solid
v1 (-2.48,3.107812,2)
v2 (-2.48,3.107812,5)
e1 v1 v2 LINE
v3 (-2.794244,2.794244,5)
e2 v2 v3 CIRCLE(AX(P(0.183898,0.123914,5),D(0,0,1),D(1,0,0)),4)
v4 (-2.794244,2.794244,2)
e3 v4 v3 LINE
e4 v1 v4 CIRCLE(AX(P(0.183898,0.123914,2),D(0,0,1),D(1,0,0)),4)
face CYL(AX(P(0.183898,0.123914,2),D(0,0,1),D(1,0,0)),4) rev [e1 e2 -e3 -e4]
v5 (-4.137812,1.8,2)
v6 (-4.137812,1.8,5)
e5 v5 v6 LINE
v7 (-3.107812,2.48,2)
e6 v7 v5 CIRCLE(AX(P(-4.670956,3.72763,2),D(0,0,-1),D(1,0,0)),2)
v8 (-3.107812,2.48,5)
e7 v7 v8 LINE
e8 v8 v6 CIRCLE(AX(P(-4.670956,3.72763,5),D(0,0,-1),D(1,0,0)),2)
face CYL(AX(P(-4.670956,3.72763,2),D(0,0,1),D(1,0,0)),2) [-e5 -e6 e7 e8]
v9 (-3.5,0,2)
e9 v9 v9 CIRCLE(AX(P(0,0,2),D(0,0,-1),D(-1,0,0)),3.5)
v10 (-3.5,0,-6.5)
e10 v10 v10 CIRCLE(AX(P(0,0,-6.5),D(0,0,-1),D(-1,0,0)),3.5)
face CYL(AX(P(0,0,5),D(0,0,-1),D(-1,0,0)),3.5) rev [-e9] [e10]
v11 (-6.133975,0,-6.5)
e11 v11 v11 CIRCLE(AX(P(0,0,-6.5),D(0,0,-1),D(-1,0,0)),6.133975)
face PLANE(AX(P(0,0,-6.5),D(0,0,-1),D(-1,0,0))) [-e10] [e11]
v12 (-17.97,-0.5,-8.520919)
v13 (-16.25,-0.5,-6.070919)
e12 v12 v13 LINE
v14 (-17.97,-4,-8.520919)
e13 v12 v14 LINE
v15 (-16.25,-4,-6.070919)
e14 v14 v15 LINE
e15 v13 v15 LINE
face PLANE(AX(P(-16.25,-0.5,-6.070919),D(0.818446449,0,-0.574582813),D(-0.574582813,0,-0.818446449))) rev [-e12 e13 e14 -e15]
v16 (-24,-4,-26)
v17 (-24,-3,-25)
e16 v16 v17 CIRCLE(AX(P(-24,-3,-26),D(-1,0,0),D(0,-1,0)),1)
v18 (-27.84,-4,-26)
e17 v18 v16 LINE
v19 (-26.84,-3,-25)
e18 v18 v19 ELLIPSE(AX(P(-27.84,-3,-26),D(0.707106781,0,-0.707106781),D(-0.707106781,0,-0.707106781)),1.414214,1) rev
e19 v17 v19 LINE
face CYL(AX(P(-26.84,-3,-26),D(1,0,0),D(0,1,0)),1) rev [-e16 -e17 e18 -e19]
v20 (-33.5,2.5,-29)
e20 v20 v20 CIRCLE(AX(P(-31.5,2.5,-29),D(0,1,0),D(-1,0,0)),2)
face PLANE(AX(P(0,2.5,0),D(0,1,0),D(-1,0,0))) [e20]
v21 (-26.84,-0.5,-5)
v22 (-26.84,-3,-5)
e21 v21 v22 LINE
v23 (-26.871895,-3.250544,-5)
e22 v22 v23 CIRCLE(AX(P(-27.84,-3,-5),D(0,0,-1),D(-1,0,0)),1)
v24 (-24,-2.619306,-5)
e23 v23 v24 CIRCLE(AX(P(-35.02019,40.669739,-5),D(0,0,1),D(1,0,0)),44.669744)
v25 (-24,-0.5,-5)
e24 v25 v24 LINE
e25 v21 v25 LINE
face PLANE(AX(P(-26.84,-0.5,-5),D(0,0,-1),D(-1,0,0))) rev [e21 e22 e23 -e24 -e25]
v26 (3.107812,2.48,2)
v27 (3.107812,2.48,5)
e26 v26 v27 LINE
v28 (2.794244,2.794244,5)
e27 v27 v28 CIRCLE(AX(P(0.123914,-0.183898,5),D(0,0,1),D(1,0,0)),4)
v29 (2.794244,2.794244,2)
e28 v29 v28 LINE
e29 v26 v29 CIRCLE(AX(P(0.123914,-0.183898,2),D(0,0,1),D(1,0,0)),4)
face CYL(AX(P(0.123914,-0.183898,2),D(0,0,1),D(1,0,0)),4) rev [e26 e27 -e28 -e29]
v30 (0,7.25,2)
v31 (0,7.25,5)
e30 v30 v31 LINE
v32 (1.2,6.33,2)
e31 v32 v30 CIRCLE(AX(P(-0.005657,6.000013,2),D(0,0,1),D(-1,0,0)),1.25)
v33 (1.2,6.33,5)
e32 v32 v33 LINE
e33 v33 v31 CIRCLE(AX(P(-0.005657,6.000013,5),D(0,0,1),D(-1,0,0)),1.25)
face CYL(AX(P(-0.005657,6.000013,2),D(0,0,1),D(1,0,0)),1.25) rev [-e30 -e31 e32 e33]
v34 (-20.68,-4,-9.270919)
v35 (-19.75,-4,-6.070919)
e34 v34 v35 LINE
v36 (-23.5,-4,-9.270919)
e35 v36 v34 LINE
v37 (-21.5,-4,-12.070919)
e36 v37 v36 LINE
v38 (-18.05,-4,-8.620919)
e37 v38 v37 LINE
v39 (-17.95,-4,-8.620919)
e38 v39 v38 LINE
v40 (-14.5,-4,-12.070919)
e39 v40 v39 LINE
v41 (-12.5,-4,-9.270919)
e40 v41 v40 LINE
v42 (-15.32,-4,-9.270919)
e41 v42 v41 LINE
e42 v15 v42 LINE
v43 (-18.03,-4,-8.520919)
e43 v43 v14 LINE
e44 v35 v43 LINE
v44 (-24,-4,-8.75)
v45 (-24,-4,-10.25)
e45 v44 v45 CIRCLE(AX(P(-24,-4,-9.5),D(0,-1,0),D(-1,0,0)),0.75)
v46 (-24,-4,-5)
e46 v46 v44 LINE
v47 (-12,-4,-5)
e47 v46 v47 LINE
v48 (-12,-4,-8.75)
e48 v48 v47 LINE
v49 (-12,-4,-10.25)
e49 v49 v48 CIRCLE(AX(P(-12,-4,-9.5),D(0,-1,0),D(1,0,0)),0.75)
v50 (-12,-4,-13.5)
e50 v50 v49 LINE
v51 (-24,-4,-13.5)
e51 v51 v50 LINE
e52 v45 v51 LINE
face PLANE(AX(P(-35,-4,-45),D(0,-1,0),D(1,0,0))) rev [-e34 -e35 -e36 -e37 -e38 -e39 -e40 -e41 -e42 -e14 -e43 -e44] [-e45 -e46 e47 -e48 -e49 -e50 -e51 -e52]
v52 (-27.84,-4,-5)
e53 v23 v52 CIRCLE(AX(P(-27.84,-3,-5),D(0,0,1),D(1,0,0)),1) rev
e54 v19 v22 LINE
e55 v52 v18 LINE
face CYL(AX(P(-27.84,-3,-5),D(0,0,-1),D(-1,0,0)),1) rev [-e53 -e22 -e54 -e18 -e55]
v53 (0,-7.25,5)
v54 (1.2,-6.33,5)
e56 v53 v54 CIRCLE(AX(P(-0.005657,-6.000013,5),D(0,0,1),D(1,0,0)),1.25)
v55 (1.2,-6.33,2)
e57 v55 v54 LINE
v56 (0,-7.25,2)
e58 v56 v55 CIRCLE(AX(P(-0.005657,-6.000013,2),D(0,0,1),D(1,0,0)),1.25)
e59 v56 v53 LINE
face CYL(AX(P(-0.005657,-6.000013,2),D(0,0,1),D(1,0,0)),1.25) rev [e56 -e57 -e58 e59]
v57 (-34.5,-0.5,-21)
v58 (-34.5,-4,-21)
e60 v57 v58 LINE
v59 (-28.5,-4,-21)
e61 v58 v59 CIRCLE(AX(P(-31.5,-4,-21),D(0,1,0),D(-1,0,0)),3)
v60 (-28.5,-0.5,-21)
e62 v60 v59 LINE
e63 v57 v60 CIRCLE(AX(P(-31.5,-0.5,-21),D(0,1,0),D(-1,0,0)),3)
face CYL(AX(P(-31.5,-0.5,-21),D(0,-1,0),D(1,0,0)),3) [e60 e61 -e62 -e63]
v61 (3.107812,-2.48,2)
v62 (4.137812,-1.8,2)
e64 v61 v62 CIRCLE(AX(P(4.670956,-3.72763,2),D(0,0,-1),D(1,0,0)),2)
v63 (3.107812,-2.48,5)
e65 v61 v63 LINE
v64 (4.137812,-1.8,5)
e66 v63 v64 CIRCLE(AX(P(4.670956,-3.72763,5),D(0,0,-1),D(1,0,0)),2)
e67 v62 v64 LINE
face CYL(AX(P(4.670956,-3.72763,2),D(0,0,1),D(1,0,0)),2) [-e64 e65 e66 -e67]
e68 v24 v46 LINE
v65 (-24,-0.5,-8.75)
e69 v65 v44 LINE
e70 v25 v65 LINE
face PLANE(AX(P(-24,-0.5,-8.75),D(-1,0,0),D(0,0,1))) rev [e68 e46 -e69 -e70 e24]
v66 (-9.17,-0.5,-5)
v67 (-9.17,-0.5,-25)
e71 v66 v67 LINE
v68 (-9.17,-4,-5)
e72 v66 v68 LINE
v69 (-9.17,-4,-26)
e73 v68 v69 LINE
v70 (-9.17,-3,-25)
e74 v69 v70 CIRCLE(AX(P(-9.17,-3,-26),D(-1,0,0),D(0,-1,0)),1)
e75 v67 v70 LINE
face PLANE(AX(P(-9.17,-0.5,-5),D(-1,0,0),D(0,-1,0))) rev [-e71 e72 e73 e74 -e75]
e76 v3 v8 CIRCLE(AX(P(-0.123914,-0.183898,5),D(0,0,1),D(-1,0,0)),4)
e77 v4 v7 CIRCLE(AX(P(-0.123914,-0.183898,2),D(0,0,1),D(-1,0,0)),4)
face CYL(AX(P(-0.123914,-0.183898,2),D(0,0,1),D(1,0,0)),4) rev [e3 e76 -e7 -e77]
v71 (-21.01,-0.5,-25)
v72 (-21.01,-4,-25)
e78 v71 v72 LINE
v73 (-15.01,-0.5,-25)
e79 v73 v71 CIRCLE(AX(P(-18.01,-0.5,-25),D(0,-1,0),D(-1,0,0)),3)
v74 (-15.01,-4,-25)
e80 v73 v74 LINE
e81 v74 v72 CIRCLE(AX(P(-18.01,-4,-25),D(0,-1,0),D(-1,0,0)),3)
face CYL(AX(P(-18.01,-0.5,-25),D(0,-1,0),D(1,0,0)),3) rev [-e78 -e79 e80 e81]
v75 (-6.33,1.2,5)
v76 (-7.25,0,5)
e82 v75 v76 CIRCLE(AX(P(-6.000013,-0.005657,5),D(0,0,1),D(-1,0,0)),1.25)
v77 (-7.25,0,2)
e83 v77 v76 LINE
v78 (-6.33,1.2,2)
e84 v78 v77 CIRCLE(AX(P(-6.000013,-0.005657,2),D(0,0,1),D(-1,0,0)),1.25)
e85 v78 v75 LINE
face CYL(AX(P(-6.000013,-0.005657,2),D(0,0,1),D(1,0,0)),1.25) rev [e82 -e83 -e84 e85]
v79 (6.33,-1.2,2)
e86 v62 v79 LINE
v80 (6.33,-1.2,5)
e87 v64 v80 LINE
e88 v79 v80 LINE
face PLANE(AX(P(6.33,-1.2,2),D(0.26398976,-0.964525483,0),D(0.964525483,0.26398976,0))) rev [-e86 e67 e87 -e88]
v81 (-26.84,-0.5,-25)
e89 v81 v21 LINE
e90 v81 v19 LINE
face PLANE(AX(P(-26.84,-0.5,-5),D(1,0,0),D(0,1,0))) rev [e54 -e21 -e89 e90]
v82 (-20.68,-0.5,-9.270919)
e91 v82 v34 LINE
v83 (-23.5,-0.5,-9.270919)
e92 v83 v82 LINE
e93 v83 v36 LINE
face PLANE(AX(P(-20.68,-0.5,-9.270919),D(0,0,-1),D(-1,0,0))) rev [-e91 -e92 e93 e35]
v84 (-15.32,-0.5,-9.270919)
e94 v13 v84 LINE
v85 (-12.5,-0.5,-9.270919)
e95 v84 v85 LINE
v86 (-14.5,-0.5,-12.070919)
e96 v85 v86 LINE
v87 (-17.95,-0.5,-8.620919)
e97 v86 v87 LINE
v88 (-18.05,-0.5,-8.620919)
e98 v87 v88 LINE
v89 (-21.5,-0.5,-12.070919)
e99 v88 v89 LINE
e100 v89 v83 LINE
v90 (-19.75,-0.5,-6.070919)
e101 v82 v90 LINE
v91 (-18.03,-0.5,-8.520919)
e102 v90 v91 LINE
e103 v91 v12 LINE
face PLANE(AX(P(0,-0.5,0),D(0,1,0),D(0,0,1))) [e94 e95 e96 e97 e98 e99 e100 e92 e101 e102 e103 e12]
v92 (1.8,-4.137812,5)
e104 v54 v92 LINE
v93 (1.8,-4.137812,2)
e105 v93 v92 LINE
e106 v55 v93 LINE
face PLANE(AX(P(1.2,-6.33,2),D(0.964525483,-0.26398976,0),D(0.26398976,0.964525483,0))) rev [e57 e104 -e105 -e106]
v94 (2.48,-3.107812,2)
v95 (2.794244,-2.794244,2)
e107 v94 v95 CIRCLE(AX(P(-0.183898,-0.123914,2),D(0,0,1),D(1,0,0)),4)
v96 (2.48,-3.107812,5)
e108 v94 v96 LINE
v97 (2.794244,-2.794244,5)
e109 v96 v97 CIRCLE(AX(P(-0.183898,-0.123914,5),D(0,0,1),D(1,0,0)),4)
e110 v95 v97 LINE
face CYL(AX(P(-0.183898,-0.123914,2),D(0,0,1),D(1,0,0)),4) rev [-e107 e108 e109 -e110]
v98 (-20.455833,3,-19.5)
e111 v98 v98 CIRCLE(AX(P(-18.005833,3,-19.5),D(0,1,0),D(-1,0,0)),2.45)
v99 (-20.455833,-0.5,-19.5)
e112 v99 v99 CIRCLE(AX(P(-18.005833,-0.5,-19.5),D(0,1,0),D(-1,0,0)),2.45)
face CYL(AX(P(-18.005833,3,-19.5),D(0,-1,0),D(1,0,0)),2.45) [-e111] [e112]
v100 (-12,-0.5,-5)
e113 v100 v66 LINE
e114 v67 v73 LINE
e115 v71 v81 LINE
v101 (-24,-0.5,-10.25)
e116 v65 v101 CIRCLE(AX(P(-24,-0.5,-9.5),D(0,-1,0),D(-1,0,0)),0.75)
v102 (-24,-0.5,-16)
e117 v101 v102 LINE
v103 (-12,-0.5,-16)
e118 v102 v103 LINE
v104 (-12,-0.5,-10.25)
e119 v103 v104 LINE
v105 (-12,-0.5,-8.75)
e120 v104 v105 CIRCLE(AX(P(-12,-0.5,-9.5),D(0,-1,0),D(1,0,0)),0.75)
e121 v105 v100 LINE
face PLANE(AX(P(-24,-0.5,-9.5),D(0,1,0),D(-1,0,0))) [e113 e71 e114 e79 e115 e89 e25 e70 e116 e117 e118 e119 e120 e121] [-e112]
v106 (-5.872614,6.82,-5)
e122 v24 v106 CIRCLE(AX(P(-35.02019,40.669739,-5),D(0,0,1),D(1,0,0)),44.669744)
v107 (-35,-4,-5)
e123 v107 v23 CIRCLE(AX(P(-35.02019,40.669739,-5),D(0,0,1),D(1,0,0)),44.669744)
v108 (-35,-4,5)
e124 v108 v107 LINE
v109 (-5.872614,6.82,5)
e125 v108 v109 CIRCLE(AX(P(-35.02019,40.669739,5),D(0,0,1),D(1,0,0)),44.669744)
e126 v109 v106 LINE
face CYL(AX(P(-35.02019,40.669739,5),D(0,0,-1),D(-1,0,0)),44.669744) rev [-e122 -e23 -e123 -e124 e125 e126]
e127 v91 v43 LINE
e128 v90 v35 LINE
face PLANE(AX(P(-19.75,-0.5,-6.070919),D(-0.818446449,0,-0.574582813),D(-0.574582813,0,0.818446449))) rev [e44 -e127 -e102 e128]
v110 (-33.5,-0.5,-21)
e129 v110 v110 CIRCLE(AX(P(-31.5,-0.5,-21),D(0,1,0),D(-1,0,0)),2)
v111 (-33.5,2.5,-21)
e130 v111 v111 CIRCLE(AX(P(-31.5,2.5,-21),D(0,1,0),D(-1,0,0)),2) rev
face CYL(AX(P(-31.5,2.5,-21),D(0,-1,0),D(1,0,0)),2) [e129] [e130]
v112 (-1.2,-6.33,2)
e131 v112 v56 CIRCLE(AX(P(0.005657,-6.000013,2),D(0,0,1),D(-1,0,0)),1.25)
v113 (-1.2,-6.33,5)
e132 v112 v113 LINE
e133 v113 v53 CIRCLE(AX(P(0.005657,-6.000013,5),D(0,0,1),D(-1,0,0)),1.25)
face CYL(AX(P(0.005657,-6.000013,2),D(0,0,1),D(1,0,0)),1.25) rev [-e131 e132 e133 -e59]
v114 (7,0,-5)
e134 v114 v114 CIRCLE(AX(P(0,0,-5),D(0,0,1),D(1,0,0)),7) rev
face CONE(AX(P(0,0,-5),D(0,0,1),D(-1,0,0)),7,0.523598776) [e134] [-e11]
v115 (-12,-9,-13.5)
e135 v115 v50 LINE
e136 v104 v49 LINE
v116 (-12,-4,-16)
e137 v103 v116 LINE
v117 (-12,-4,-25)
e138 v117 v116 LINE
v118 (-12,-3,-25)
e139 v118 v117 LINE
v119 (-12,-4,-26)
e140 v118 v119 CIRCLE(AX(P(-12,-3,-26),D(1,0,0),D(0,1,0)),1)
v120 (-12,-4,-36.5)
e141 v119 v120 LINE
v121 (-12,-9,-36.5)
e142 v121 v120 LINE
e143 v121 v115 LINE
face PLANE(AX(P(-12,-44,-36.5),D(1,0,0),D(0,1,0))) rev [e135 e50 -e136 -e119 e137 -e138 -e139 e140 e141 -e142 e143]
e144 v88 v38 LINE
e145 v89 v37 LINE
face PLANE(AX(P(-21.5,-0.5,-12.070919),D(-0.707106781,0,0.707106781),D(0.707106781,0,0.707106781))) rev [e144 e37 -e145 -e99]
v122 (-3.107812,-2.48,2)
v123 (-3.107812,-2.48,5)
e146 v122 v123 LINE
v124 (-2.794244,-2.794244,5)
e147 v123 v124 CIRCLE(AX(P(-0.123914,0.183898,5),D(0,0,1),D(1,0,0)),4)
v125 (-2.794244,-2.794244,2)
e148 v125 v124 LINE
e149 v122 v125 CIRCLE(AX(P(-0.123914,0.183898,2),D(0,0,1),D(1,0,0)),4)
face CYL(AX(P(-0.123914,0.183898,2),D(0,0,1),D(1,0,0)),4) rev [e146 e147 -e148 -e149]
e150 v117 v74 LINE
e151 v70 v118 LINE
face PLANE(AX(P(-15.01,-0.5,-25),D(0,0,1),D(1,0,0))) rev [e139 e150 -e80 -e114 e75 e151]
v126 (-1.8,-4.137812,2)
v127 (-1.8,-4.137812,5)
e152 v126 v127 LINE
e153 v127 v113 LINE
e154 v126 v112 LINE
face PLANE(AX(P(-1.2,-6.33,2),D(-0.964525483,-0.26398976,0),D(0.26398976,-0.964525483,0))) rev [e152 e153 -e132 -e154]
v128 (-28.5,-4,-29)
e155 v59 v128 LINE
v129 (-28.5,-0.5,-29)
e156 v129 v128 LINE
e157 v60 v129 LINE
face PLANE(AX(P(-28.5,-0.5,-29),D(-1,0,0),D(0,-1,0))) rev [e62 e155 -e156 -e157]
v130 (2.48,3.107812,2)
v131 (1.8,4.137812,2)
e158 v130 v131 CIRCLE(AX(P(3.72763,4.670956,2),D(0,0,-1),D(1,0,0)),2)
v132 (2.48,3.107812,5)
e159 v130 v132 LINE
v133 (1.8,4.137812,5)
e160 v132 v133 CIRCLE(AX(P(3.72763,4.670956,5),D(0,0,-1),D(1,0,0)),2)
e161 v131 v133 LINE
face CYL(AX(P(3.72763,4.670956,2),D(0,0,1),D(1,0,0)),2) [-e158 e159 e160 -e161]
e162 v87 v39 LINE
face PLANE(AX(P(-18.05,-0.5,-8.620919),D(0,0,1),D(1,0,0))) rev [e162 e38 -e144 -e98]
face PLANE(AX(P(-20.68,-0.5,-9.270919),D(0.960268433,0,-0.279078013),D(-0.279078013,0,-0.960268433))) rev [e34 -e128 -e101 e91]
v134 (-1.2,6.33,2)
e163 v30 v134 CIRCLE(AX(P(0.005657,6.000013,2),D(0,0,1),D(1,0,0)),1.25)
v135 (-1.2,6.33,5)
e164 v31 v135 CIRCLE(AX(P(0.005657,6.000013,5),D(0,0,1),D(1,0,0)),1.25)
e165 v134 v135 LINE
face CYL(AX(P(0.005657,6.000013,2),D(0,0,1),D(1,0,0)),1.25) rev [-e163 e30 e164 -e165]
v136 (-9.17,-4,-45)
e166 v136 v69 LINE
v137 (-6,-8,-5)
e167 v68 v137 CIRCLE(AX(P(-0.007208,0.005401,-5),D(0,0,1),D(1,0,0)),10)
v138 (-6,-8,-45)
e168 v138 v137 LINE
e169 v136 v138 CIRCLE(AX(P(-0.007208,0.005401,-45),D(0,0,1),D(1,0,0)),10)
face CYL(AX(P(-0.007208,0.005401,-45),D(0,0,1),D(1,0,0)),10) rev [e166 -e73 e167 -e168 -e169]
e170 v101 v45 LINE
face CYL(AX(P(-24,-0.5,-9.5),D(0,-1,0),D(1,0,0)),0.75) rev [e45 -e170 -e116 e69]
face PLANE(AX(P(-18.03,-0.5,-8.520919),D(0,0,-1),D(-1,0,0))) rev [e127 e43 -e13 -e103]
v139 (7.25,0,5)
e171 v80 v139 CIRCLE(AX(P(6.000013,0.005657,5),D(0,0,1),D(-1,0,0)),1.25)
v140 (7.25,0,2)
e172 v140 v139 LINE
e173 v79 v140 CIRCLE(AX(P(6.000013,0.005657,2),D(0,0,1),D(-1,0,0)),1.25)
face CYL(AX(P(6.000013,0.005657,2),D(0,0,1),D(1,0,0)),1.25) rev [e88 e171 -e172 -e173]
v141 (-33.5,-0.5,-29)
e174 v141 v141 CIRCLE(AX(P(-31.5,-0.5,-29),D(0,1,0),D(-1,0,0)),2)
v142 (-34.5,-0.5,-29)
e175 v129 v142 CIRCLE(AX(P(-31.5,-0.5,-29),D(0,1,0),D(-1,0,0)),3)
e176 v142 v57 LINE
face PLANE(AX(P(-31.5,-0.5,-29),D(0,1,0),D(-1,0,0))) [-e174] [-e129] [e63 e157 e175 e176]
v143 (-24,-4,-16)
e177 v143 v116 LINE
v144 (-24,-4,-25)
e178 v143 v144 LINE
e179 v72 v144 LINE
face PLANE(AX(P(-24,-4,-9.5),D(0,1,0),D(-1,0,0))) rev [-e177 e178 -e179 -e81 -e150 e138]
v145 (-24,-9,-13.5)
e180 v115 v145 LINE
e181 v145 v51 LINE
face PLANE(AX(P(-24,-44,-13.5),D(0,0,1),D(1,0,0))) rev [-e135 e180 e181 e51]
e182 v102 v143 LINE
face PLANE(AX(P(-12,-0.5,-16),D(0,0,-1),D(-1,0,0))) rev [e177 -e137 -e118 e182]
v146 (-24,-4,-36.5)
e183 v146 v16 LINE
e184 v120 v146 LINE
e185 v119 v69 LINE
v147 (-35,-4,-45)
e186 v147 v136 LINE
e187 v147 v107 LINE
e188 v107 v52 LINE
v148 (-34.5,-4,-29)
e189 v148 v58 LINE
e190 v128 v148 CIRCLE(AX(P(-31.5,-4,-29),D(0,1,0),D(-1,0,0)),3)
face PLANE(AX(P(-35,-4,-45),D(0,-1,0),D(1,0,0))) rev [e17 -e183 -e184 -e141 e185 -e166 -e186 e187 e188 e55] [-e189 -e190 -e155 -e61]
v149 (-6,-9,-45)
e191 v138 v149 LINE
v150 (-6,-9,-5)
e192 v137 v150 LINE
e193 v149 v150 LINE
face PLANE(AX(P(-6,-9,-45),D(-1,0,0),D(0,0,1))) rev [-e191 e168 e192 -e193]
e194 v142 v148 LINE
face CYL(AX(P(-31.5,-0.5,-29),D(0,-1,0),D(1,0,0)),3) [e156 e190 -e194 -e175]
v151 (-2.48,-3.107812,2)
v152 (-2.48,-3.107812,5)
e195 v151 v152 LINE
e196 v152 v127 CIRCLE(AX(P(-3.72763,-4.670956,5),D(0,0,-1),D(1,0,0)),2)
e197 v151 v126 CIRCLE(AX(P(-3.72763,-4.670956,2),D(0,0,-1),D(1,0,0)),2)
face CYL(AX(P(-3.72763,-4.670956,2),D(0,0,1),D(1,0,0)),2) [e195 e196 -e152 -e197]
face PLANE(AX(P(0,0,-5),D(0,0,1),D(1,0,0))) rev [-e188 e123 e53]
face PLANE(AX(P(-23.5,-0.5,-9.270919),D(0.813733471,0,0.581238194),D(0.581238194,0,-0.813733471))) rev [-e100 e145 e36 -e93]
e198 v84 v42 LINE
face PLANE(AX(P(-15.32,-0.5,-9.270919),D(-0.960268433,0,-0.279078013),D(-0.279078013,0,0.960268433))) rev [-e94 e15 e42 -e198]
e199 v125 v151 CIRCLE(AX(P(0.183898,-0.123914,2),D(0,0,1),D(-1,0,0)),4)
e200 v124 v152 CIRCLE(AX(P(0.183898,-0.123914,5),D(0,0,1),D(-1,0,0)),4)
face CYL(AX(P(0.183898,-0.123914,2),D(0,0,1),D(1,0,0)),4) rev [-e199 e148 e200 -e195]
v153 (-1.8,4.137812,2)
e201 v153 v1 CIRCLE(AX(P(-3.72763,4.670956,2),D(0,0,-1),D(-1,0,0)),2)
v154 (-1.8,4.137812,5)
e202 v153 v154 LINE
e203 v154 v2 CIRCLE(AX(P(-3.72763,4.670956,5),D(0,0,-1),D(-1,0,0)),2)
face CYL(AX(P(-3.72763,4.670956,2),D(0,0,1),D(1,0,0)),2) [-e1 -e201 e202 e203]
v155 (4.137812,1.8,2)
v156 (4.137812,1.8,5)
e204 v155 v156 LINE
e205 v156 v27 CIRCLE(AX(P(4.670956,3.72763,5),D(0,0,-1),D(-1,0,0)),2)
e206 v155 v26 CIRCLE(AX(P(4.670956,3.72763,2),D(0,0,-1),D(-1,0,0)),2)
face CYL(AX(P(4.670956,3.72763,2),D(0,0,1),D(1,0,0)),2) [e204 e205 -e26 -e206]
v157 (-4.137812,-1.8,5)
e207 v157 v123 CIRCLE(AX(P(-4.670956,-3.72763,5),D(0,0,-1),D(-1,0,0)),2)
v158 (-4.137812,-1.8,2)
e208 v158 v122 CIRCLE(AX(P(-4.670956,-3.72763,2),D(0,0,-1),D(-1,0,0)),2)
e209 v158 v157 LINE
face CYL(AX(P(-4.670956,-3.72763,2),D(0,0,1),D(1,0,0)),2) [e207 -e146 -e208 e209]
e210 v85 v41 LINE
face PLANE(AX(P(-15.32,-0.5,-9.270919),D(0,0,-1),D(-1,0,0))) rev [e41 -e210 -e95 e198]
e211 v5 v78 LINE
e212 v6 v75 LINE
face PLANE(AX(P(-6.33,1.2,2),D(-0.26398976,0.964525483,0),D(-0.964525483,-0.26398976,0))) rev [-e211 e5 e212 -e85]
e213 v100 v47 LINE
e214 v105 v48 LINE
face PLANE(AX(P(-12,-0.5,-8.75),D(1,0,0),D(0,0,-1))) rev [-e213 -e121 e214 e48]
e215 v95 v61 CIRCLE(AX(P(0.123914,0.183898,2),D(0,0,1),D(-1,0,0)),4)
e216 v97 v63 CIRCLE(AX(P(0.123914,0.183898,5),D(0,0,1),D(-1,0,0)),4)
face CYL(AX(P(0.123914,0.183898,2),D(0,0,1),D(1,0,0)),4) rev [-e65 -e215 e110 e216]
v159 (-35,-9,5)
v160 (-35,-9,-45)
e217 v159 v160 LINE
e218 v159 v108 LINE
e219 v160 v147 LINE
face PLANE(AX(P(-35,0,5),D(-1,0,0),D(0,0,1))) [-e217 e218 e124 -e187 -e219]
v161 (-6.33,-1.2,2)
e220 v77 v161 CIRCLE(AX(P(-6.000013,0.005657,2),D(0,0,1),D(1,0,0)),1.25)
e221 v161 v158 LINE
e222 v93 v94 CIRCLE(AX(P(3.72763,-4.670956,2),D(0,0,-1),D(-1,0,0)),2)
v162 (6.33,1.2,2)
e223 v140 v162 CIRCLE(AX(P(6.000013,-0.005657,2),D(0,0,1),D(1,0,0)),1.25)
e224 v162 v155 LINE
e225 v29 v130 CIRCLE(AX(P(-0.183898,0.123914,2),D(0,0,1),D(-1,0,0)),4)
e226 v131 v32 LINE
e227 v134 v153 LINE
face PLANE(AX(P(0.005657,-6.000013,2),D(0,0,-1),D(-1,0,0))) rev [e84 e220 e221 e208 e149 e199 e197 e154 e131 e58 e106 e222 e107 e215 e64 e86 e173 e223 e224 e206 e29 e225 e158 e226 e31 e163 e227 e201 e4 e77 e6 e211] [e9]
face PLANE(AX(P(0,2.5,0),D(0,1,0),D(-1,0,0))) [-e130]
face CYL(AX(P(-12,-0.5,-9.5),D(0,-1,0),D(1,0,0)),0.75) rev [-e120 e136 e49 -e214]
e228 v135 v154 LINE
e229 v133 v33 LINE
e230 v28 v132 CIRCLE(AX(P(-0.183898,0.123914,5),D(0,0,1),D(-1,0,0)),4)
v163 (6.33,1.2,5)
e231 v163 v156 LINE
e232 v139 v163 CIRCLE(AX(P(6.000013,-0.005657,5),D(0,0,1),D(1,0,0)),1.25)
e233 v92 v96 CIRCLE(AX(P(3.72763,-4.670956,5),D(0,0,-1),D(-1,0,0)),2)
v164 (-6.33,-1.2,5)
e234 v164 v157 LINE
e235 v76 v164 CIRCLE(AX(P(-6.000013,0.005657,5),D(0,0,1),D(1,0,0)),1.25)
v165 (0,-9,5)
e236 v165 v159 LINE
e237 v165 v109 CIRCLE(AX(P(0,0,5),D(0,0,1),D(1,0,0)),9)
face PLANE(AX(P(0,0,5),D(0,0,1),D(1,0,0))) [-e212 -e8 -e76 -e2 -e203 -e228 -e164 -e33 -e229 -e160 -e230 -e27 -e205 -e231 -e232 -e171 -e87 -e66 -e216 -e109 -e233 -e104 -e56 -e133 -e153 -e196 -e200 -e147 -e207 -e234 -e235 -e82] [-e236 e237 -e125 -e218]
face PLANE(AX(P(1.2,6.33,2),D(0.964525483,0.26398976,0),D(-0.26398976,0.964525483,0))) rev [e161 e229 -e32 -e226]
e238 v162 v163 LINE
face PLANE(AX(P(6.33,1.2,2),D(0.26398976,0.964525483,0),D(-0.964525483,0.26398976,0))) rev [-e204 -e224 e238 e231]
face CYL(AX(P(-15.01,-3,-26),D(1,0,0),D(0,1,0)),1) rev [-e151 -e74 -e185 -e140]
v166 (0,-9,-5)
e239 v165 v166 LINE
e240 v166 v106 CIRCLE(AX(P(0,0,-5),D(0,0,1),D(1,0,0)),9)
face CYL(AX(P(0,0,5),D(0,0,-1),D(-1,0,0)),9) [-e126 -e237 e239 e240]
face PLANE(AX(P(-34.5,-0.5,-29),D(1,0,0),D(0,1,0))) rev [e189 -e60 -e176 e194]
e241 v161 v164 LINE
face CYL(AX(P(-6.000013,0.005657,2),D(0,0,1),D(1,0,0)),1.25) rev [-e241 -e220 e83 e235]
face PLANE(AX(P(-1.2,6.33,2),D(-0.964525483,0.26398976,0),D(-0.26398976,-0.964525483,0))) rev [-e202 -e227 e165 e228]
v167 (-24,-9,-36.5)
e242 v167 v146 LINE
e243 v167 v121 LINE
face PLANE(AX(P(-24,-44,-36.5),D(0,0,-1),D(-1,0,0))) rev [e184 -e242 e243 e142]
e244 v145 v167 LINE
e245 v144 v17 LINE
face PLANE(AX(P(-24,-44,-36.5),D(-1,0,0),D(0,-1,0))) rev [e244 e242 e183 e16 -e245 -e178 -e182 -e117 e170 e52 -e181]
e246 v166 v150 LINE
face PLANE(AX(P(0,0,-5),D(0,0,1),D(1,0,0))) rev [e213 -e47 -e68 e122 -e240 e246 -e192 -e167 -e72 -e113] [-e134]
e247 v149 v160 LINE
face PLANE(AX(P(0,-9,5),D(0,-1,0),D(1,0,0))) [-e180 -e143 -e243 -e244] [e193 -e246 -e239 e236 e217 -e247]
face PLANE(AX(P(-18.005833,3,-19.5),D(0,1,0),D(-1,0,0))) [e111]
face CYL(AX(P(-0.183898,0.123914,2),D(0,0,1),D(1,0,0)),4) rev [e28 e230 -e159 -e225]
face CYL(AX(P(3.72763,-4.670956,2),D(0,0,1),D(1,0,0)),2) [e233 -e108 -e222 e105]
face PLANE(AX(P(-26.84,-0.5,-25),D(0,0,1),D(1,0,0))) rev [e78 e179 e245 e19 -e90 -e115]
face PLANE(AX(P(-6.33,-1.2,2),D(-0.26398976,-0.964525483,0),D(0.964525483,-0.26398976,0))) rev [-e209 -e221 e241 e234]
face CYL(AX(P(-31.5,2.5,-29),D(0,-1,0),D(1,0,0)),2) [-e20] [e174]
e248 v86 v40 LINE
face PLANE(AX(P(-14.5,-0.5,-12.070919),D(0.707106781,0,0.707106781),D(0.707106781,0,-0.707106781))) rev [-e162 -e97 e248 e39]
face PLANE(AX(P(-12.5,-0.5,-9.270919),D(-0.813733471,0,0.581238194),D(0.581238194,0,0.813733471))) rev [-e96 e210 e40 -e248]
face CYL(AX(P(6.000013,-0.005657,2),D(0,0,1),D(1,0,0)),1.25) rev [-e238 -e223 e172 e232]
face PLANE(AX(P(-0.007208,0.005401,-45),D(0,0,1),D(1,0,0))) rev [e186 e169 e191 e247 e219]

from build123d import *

# Parameters (mm, degrees)
SKETCH1_R                     = 9
BOSS_EXTRUDE1_DEPTH           = 5
SKETCH2_R                     = 7
BOSS_EXTRUDE2_DEPTH           = 1.5
BOSS_EXTRUDE2_TAPER           = 30
BOSS_EXTRUDE2_OTHER_WAY_DEPTH = 1.5
BOSS_EXTRUDE2_OTHER_WAY_TAPER = 30
CUT_EXTRUDE1_DEPTH            = 3
BOSS_EXTRUDE3_DEPTH           = 40
SKETCH5_W                     = 12
SKETCH5_H                     = 23
CUT_EXTRUDE2_DEPTH            = 40
BOSS_EXTRUDE4_DEPTH           = 3.5
SKETCH7_R                     = 2
BOSS_EXTRUDE5_DEPTH           = 3
SKETCH8_R                     = 3.5
CUT_EXTRUDE3_DEPTH            = 53.803882433
BOSS_EXTRUDE6_DEPTH           = 3.5
SKETCH10_R                    = 2.45
BOSS_EXTRUDE7_DEPTH           = 3.5
BOSS_EXTRUDE8_DEPTH           = 3.5
FILLET1_START                 = -26.84
FILLET1_DEPTH                 = 2.84
FILLET1_START_2               = -12
FILLET1_2_DEPTH               = 2.83
FILLET1_START_3               = -26
FILLET1_3_DEPTH               = 21
FILLET1_START_4               = -27.84
FILLET1_4_DEPTH               = 1


with BuildPart() as part:
    # Sketch1 → Boss-Extrude1 (new, symmetric)
    with BuildSketch(Plane.XY):
        Circle(SKETCH1_R)
        with BuildLine():
            Line((-35, -9), (0, -9))
            ThreePointArc((0, -9), (-8.437416666, -3.132091953), (-5.872614409, 6.82))
            ThreePointArc((-5.872614409, 6.82), (-19.465199243, -1.204217751), (-35, -4))
            Line((-35, -4), (-35, -9))
        make_face()
    extrude(amount=BOSS_EXTRUDE1_DEPTH, both=True)

    # Sketch2 → Boss-Extrude2 (add)
    with BuildSketch(Plane(origin=(0, 0, -5), x_dir=(-1, 0, 0), z_dir=(0, 0, -1))):
        Circle(SKETCH2_R)
    extrude(amount=BOSS_EXTRUDE2_DEPTH, taper=BOSS_EXTRUDE2_TAPER)

    # Sketch2 → Boss-Extrude2 other way (add)
    with BuildSketch(Plane(origin=(0, 0, -5), x_dir=(-1, 0, 0), z_dir=(0, 0, -1))):
        Circle(SKETCH2_R)
    extrude(amount=-BOSS_EXTRUDE2_OTHER_WAY_DEPTH, taper=BOSS_EXTRUDE2_OTHER_WAY_TAPER)

    # Sketch3 → Cut-Extrude1 (cut)
    with BuildSketch(Plane.XY.offset(5)):
        with BuildLine():
            Line((1.2, -6.33), (1.8, -4.1378116))
            ThreePointArc((1.8, -4.1378116), (2.058560194, -3.569045514), (2.48, -3.1078116))
            ThreePointArc((2.48, -3.1078116), (2.641475661, -2.955390865), (2.794244497, -2.794244497))
            ThreePointArc((2.794244497, -2.794244497), (2.955390865, -2.641475661), (3.1078116, -2.48))
            ThreePointArc((3.1078116, -2.48), (3.569045514, -2.058560194), (4.1378116, -1.8))
            Line((4.1378116, -1.8), (6.33, -1.2))
            ThreePointArc((6.33, -1.2), (6.992020752, -0.754882576), (7.25, 0))
            ThreePointArc((7.25, 0), (6.992020752, 0.754882576), (6.33, 1.2))
            Line((6.33, 1.2), (4.1378116, 1.8))
            ThreePointArc((4.1378116, 1.8), (3.569045514, 2.058560194), (3.1078116, 2.48))
            ThreePointArc((3.1078116, 2.48), (2.955390865, 2.641475661), (2.794244497, 2.794244497))
            ThreePointArc((2.794244497, 2.794244497), (2.641475661, 2.955390865), (2.48, 3.1078116))
            ThreePointArc((2.48, 3.1078116), (2.058560194, 3.569045514), (1.8, 4.1378116))
            Line((1.8, 4.1378116), (1.2, 6.33))
            ThreePointArc((1.2, 6.33), (0.754882576, 6.992020752), (0, 7.25))
            ThreePointArc((0, 7.25), (-0.754882576, 6.992020752), (-1.2, 6.33))
            Line((-1.2, 6.33), (-1.8, 4.1378116))
            ThreePointArc((-1.8, 4.1378116), (-2.058560194, 3.569045514), (-2.48, 3.1078116))
            ThreePointArc((-2.48, 3.1078116), (-2.641475661, 2.955390865), (-2.794244497, 2.794244497))
            ThreePointArc((-2.794244497, 2.794244497), (-2.955390865, 2.641475661), (-3.1078116, 2.48))
            ThreePointArc((-3.1078116, 2.48), (-3.569045514, 2.058560194), (-4.1378116, 1.8))
            Line((-4.1378116, 1.8), (-6.33, 1.2))
            ThreePointArc((-6.33, 1.2), (-6.992020752, 0.754882576), (-7.25, 0))
            ThreePointArc((-7.25, 0), (-6.992020752, -0.754882576), (-6.33, -1.2))
            Line((-6.33, -1.2), (-4.1378116, -1.8))
            ThreePointArc((-4.1378116, -1.8), (-3.569045514, -2.058560194), (-3.1078116, -2.48))
            ThreePointArc((-3.1078116, -2.48), (-2.955390865, -2.641475661), (-2.794244497, -2.794244497))
            ThreePointArc((-2.794244497, -2.794244497), (-2.641475661, -2.955390865), (-2.48, -3.1078116))
            ThreePointArc((-2.48, -3.1078116), (-2.058560194, -3.569045514), (-1.8, -4.1378116))
            Line((-1.8, -4.1378116), (-1.2, -6.33))
            ThreePointArc((-1.2, -6.33), (-0.754882576, -6.992020752), (0, -7.25))
            ThreePointArc((0, -7.25), (0.754882576, -6.992020752), (1.2, -6.33))
        make_face()
    extrude(amount=-CUT_EXTRUDE1_DEPTH, mode=Mode.SUBTRACT)

    # Sketch4 → Boss-Extrude3 (add)
    with BuildSketch(Plane(origin=(0, 0, -5), x_dir=(-1, 0, 0), z_dir=(0, 0, -1))):
        with BuildLine():
            Line((35, -9), (35, -4))
            Line((35, -4), (9.17, -4))
            ThreePointArc((9.17, -4), (7.844486312, -6.205642902), (6, -8))
            Line((6, -8), (6, -9))
            Line((6, -9), (35, -9))
        make_face()
    extrude(amount=BOSS_EXTRUDE3_DEPTH)

    # Sketch5 → Cut-Extrude2 (cut)
    with BuildSketch(Plane(origin=(0, -4, 0), x_dir=(1, 0, 0), z_dir=(0, 1, 0))):
        with Locations((-18, 25)):
            Rectangle(SKETCH5_W, SKETCH5_H)
    extrude(amount=-CUT_EXTRUDE2_DEPTH, mode=Mode.SUBTRACT)

    # Sketch6 → Boss-Extrude4 (add)
    with BuildSketch(Plane(origin=(0, -4, 0), x_dir=(1, 0, 0), z_dir=(0, 1, 0))):
        with BuildLine():
            Line((-28.5, 29), (-28.5, 21))
            ThreePointArc((-28.5, 21), (-31.5, 18), (-34.5, 21))
            Line((-34.5, 21), (-34.5, 29))
            ThreePointArc((-34.5, 29), (-31.5, 32), (-28.5, 29))
        make_face()
    extrude(amount=BOSS_EXTRUDE4_DEPTH)

    # Sketch7 → Boss-Extrude5 (add)
    with BuildSketch(Plane(origin=(0, -0.5, 0), x_dir=(1, 0, 0), z_dir=(0, 1, 0))):
        with Locations(Location((-31.5, 29, 0), (0, 0, 180))):
            Circle(SKETCH7_R)
        with Locations(Location((-31.5, 21, 0), (0, 0, 180))):
            Circle(SKETCH7_R)
    extrude(amount=BOSS_EXTRUDE5_DEPTH)

    # Sketch8 → Cut-Extrude3 (cut, through all)
    with BuildSketch(Plane(origin=(0, 0, -6.5), x_dir=(-1, 0, 0), z_dir=(0, 0, -1))):
        Circle(SKETCH8_R)
    extrude(amount=-CUT_EXTRUDE3_DEPTH, mode=Mode.SUBTRACT)

    # Sketch9 → Boss-Extrude6 (add)
    with BuildSketch(Plane(origin=(0, -4, 0), x_dir=(1, 0, 0), z_dir=(0, 1, 0))):
        with BuildLine():
            Line((-26.84, 5), (-26.84, 25))
            Line((-26.84, 25), (-21.01, 25))
            ThreePointArc((-21.01, 25), (-18.01, 22), (-15.01, 25))
            Line((-15.01, 25), (-9.17, 25))
            Line((-9.17, 25), (-9.17, 5))
            Line((-9.17, 5), (-12, 5))
            Line((-12, 5), (-12, 8.75))
            ThreePointArc((-12, 8.75), (-11.25, 9.5), (-12, 10.25))
            Line((-12, 10.25), (-12, 16))
            Line((-12, 16), (-17.99, 16))
            Line((-17.99, 16), (-18.01, 16))
            Line((-18.01, 16), (-24, 16))
            Line((-24, 16), (-24, 10.25))
            ThreePointArc((-24, 10.25), (-24.75, 9.5), (-24, 8.75))
            Line((-24, 8.75), (-24, 5))
            Line((-24, 5), (-26.84, 5))
        make_face()
    extrude(amount=BOSS_EXTRUDE6_DEPTH)

    # Sketch10 → Boss-Extrude7 (add)
    with BuildSketch(Plane(origin=(0, -0.5, 0), x_dir=(1, 0, 0), z_dir=(0, 1, 0))):
        with Locations(Location((-18.005833333, 19.5, 0), (0, 0, 180))):
            Circle(SKETCH10_R)
    extrude(amount=BOSS_EXTRUDE7_DEPTH)

    # Sketch11 → Boss-Extrude8 (add)
    with BuildSketch(Plane(origin=(0, -4, 0), x_dir=(1, 0, 0), z_dir=(0, 1, 0))):
        Polygon((-20.68, 9.27091935), (-23.5, 9.27091935), (-21.5, 12.07091935), (-18.05, 8.62091935), (-18, 8.62091935), (-17.95, 8.62091935), (-14.5, 12.07091935), (-12.5, 9.27091935), (-15.32, 9.27091935), (-16.25, 6.07091935), (-17.97, 8.52091935), (-18.03, 8.52091935), (-19.75, 6.07091935), align=None)
    extrude(amount=BOSS_EXTRUDE8_DEPTH)

    # Fillet1: read off the stored shape, not the designer's step
    # Fillet1 outline → Fillet1 (add)
    with BuildSketch(Plane.YZ.offset(FILLET1_START)):
        with BuildLine():
            ThreePointArc((-4, -26), (-3.707106781, -25.292893219), (-3, -25))
            Line((-3, -25), (-4, -25))
            Line((-4, -25), (-4, -26))
        make_face()
    extrude(amount=FILLET1_DEPTH)

    # Fillet1 2 outline → Fillet1 2 (add)
    with BuildSketch(Plane.YZ.offset(FILLET1_START_2)):
        with BuildLine():
            ThreePointArc((-4, -26), (-3.707106781, -25.292893219), (-3, -25))
            Line((-3, -25), (-4, -25))
            Line((-4, -25), (-4, -26))
        make_face()
    extrude(amount=FILLET1_2_DEPTH)

    # Fillet1 3 outline → Fillet1 3 (add)
    with BuildSketch(Plane.XY.offset(FILLET1_START_3)):
        with BuildLine():
            Line((-26.84, -4), (-26.84, -3))
            ThreePointArc((-26.84, -3), (-27.132893219, -3.707106781), (-27.84, -4))
            Line((-27.84, -4), (-26.84, -4))
        make_face()
    extrude(amount=FILLET1_3_DEPTH)

    # Fillet1 4 outline → Fillet1 4 (cut)
    with BuildSketch(Plane.YZ.offset(FILLET1_START_4)):
        with BuildLine():
            Line((-2, -24.999999999), (-3, -25))
            ThreePointArc((-3, -25), (-3.707106781, -25.292893219), (-4, -26))
            Line((-4, -26), (-2, -26))
            Line((-2, -26), (-2, -24.999999999))
        make_face()
    extrude(amount=FILLET1_4_DEPTH, mode=Mode.SUBTRACT)


solid = part.part
